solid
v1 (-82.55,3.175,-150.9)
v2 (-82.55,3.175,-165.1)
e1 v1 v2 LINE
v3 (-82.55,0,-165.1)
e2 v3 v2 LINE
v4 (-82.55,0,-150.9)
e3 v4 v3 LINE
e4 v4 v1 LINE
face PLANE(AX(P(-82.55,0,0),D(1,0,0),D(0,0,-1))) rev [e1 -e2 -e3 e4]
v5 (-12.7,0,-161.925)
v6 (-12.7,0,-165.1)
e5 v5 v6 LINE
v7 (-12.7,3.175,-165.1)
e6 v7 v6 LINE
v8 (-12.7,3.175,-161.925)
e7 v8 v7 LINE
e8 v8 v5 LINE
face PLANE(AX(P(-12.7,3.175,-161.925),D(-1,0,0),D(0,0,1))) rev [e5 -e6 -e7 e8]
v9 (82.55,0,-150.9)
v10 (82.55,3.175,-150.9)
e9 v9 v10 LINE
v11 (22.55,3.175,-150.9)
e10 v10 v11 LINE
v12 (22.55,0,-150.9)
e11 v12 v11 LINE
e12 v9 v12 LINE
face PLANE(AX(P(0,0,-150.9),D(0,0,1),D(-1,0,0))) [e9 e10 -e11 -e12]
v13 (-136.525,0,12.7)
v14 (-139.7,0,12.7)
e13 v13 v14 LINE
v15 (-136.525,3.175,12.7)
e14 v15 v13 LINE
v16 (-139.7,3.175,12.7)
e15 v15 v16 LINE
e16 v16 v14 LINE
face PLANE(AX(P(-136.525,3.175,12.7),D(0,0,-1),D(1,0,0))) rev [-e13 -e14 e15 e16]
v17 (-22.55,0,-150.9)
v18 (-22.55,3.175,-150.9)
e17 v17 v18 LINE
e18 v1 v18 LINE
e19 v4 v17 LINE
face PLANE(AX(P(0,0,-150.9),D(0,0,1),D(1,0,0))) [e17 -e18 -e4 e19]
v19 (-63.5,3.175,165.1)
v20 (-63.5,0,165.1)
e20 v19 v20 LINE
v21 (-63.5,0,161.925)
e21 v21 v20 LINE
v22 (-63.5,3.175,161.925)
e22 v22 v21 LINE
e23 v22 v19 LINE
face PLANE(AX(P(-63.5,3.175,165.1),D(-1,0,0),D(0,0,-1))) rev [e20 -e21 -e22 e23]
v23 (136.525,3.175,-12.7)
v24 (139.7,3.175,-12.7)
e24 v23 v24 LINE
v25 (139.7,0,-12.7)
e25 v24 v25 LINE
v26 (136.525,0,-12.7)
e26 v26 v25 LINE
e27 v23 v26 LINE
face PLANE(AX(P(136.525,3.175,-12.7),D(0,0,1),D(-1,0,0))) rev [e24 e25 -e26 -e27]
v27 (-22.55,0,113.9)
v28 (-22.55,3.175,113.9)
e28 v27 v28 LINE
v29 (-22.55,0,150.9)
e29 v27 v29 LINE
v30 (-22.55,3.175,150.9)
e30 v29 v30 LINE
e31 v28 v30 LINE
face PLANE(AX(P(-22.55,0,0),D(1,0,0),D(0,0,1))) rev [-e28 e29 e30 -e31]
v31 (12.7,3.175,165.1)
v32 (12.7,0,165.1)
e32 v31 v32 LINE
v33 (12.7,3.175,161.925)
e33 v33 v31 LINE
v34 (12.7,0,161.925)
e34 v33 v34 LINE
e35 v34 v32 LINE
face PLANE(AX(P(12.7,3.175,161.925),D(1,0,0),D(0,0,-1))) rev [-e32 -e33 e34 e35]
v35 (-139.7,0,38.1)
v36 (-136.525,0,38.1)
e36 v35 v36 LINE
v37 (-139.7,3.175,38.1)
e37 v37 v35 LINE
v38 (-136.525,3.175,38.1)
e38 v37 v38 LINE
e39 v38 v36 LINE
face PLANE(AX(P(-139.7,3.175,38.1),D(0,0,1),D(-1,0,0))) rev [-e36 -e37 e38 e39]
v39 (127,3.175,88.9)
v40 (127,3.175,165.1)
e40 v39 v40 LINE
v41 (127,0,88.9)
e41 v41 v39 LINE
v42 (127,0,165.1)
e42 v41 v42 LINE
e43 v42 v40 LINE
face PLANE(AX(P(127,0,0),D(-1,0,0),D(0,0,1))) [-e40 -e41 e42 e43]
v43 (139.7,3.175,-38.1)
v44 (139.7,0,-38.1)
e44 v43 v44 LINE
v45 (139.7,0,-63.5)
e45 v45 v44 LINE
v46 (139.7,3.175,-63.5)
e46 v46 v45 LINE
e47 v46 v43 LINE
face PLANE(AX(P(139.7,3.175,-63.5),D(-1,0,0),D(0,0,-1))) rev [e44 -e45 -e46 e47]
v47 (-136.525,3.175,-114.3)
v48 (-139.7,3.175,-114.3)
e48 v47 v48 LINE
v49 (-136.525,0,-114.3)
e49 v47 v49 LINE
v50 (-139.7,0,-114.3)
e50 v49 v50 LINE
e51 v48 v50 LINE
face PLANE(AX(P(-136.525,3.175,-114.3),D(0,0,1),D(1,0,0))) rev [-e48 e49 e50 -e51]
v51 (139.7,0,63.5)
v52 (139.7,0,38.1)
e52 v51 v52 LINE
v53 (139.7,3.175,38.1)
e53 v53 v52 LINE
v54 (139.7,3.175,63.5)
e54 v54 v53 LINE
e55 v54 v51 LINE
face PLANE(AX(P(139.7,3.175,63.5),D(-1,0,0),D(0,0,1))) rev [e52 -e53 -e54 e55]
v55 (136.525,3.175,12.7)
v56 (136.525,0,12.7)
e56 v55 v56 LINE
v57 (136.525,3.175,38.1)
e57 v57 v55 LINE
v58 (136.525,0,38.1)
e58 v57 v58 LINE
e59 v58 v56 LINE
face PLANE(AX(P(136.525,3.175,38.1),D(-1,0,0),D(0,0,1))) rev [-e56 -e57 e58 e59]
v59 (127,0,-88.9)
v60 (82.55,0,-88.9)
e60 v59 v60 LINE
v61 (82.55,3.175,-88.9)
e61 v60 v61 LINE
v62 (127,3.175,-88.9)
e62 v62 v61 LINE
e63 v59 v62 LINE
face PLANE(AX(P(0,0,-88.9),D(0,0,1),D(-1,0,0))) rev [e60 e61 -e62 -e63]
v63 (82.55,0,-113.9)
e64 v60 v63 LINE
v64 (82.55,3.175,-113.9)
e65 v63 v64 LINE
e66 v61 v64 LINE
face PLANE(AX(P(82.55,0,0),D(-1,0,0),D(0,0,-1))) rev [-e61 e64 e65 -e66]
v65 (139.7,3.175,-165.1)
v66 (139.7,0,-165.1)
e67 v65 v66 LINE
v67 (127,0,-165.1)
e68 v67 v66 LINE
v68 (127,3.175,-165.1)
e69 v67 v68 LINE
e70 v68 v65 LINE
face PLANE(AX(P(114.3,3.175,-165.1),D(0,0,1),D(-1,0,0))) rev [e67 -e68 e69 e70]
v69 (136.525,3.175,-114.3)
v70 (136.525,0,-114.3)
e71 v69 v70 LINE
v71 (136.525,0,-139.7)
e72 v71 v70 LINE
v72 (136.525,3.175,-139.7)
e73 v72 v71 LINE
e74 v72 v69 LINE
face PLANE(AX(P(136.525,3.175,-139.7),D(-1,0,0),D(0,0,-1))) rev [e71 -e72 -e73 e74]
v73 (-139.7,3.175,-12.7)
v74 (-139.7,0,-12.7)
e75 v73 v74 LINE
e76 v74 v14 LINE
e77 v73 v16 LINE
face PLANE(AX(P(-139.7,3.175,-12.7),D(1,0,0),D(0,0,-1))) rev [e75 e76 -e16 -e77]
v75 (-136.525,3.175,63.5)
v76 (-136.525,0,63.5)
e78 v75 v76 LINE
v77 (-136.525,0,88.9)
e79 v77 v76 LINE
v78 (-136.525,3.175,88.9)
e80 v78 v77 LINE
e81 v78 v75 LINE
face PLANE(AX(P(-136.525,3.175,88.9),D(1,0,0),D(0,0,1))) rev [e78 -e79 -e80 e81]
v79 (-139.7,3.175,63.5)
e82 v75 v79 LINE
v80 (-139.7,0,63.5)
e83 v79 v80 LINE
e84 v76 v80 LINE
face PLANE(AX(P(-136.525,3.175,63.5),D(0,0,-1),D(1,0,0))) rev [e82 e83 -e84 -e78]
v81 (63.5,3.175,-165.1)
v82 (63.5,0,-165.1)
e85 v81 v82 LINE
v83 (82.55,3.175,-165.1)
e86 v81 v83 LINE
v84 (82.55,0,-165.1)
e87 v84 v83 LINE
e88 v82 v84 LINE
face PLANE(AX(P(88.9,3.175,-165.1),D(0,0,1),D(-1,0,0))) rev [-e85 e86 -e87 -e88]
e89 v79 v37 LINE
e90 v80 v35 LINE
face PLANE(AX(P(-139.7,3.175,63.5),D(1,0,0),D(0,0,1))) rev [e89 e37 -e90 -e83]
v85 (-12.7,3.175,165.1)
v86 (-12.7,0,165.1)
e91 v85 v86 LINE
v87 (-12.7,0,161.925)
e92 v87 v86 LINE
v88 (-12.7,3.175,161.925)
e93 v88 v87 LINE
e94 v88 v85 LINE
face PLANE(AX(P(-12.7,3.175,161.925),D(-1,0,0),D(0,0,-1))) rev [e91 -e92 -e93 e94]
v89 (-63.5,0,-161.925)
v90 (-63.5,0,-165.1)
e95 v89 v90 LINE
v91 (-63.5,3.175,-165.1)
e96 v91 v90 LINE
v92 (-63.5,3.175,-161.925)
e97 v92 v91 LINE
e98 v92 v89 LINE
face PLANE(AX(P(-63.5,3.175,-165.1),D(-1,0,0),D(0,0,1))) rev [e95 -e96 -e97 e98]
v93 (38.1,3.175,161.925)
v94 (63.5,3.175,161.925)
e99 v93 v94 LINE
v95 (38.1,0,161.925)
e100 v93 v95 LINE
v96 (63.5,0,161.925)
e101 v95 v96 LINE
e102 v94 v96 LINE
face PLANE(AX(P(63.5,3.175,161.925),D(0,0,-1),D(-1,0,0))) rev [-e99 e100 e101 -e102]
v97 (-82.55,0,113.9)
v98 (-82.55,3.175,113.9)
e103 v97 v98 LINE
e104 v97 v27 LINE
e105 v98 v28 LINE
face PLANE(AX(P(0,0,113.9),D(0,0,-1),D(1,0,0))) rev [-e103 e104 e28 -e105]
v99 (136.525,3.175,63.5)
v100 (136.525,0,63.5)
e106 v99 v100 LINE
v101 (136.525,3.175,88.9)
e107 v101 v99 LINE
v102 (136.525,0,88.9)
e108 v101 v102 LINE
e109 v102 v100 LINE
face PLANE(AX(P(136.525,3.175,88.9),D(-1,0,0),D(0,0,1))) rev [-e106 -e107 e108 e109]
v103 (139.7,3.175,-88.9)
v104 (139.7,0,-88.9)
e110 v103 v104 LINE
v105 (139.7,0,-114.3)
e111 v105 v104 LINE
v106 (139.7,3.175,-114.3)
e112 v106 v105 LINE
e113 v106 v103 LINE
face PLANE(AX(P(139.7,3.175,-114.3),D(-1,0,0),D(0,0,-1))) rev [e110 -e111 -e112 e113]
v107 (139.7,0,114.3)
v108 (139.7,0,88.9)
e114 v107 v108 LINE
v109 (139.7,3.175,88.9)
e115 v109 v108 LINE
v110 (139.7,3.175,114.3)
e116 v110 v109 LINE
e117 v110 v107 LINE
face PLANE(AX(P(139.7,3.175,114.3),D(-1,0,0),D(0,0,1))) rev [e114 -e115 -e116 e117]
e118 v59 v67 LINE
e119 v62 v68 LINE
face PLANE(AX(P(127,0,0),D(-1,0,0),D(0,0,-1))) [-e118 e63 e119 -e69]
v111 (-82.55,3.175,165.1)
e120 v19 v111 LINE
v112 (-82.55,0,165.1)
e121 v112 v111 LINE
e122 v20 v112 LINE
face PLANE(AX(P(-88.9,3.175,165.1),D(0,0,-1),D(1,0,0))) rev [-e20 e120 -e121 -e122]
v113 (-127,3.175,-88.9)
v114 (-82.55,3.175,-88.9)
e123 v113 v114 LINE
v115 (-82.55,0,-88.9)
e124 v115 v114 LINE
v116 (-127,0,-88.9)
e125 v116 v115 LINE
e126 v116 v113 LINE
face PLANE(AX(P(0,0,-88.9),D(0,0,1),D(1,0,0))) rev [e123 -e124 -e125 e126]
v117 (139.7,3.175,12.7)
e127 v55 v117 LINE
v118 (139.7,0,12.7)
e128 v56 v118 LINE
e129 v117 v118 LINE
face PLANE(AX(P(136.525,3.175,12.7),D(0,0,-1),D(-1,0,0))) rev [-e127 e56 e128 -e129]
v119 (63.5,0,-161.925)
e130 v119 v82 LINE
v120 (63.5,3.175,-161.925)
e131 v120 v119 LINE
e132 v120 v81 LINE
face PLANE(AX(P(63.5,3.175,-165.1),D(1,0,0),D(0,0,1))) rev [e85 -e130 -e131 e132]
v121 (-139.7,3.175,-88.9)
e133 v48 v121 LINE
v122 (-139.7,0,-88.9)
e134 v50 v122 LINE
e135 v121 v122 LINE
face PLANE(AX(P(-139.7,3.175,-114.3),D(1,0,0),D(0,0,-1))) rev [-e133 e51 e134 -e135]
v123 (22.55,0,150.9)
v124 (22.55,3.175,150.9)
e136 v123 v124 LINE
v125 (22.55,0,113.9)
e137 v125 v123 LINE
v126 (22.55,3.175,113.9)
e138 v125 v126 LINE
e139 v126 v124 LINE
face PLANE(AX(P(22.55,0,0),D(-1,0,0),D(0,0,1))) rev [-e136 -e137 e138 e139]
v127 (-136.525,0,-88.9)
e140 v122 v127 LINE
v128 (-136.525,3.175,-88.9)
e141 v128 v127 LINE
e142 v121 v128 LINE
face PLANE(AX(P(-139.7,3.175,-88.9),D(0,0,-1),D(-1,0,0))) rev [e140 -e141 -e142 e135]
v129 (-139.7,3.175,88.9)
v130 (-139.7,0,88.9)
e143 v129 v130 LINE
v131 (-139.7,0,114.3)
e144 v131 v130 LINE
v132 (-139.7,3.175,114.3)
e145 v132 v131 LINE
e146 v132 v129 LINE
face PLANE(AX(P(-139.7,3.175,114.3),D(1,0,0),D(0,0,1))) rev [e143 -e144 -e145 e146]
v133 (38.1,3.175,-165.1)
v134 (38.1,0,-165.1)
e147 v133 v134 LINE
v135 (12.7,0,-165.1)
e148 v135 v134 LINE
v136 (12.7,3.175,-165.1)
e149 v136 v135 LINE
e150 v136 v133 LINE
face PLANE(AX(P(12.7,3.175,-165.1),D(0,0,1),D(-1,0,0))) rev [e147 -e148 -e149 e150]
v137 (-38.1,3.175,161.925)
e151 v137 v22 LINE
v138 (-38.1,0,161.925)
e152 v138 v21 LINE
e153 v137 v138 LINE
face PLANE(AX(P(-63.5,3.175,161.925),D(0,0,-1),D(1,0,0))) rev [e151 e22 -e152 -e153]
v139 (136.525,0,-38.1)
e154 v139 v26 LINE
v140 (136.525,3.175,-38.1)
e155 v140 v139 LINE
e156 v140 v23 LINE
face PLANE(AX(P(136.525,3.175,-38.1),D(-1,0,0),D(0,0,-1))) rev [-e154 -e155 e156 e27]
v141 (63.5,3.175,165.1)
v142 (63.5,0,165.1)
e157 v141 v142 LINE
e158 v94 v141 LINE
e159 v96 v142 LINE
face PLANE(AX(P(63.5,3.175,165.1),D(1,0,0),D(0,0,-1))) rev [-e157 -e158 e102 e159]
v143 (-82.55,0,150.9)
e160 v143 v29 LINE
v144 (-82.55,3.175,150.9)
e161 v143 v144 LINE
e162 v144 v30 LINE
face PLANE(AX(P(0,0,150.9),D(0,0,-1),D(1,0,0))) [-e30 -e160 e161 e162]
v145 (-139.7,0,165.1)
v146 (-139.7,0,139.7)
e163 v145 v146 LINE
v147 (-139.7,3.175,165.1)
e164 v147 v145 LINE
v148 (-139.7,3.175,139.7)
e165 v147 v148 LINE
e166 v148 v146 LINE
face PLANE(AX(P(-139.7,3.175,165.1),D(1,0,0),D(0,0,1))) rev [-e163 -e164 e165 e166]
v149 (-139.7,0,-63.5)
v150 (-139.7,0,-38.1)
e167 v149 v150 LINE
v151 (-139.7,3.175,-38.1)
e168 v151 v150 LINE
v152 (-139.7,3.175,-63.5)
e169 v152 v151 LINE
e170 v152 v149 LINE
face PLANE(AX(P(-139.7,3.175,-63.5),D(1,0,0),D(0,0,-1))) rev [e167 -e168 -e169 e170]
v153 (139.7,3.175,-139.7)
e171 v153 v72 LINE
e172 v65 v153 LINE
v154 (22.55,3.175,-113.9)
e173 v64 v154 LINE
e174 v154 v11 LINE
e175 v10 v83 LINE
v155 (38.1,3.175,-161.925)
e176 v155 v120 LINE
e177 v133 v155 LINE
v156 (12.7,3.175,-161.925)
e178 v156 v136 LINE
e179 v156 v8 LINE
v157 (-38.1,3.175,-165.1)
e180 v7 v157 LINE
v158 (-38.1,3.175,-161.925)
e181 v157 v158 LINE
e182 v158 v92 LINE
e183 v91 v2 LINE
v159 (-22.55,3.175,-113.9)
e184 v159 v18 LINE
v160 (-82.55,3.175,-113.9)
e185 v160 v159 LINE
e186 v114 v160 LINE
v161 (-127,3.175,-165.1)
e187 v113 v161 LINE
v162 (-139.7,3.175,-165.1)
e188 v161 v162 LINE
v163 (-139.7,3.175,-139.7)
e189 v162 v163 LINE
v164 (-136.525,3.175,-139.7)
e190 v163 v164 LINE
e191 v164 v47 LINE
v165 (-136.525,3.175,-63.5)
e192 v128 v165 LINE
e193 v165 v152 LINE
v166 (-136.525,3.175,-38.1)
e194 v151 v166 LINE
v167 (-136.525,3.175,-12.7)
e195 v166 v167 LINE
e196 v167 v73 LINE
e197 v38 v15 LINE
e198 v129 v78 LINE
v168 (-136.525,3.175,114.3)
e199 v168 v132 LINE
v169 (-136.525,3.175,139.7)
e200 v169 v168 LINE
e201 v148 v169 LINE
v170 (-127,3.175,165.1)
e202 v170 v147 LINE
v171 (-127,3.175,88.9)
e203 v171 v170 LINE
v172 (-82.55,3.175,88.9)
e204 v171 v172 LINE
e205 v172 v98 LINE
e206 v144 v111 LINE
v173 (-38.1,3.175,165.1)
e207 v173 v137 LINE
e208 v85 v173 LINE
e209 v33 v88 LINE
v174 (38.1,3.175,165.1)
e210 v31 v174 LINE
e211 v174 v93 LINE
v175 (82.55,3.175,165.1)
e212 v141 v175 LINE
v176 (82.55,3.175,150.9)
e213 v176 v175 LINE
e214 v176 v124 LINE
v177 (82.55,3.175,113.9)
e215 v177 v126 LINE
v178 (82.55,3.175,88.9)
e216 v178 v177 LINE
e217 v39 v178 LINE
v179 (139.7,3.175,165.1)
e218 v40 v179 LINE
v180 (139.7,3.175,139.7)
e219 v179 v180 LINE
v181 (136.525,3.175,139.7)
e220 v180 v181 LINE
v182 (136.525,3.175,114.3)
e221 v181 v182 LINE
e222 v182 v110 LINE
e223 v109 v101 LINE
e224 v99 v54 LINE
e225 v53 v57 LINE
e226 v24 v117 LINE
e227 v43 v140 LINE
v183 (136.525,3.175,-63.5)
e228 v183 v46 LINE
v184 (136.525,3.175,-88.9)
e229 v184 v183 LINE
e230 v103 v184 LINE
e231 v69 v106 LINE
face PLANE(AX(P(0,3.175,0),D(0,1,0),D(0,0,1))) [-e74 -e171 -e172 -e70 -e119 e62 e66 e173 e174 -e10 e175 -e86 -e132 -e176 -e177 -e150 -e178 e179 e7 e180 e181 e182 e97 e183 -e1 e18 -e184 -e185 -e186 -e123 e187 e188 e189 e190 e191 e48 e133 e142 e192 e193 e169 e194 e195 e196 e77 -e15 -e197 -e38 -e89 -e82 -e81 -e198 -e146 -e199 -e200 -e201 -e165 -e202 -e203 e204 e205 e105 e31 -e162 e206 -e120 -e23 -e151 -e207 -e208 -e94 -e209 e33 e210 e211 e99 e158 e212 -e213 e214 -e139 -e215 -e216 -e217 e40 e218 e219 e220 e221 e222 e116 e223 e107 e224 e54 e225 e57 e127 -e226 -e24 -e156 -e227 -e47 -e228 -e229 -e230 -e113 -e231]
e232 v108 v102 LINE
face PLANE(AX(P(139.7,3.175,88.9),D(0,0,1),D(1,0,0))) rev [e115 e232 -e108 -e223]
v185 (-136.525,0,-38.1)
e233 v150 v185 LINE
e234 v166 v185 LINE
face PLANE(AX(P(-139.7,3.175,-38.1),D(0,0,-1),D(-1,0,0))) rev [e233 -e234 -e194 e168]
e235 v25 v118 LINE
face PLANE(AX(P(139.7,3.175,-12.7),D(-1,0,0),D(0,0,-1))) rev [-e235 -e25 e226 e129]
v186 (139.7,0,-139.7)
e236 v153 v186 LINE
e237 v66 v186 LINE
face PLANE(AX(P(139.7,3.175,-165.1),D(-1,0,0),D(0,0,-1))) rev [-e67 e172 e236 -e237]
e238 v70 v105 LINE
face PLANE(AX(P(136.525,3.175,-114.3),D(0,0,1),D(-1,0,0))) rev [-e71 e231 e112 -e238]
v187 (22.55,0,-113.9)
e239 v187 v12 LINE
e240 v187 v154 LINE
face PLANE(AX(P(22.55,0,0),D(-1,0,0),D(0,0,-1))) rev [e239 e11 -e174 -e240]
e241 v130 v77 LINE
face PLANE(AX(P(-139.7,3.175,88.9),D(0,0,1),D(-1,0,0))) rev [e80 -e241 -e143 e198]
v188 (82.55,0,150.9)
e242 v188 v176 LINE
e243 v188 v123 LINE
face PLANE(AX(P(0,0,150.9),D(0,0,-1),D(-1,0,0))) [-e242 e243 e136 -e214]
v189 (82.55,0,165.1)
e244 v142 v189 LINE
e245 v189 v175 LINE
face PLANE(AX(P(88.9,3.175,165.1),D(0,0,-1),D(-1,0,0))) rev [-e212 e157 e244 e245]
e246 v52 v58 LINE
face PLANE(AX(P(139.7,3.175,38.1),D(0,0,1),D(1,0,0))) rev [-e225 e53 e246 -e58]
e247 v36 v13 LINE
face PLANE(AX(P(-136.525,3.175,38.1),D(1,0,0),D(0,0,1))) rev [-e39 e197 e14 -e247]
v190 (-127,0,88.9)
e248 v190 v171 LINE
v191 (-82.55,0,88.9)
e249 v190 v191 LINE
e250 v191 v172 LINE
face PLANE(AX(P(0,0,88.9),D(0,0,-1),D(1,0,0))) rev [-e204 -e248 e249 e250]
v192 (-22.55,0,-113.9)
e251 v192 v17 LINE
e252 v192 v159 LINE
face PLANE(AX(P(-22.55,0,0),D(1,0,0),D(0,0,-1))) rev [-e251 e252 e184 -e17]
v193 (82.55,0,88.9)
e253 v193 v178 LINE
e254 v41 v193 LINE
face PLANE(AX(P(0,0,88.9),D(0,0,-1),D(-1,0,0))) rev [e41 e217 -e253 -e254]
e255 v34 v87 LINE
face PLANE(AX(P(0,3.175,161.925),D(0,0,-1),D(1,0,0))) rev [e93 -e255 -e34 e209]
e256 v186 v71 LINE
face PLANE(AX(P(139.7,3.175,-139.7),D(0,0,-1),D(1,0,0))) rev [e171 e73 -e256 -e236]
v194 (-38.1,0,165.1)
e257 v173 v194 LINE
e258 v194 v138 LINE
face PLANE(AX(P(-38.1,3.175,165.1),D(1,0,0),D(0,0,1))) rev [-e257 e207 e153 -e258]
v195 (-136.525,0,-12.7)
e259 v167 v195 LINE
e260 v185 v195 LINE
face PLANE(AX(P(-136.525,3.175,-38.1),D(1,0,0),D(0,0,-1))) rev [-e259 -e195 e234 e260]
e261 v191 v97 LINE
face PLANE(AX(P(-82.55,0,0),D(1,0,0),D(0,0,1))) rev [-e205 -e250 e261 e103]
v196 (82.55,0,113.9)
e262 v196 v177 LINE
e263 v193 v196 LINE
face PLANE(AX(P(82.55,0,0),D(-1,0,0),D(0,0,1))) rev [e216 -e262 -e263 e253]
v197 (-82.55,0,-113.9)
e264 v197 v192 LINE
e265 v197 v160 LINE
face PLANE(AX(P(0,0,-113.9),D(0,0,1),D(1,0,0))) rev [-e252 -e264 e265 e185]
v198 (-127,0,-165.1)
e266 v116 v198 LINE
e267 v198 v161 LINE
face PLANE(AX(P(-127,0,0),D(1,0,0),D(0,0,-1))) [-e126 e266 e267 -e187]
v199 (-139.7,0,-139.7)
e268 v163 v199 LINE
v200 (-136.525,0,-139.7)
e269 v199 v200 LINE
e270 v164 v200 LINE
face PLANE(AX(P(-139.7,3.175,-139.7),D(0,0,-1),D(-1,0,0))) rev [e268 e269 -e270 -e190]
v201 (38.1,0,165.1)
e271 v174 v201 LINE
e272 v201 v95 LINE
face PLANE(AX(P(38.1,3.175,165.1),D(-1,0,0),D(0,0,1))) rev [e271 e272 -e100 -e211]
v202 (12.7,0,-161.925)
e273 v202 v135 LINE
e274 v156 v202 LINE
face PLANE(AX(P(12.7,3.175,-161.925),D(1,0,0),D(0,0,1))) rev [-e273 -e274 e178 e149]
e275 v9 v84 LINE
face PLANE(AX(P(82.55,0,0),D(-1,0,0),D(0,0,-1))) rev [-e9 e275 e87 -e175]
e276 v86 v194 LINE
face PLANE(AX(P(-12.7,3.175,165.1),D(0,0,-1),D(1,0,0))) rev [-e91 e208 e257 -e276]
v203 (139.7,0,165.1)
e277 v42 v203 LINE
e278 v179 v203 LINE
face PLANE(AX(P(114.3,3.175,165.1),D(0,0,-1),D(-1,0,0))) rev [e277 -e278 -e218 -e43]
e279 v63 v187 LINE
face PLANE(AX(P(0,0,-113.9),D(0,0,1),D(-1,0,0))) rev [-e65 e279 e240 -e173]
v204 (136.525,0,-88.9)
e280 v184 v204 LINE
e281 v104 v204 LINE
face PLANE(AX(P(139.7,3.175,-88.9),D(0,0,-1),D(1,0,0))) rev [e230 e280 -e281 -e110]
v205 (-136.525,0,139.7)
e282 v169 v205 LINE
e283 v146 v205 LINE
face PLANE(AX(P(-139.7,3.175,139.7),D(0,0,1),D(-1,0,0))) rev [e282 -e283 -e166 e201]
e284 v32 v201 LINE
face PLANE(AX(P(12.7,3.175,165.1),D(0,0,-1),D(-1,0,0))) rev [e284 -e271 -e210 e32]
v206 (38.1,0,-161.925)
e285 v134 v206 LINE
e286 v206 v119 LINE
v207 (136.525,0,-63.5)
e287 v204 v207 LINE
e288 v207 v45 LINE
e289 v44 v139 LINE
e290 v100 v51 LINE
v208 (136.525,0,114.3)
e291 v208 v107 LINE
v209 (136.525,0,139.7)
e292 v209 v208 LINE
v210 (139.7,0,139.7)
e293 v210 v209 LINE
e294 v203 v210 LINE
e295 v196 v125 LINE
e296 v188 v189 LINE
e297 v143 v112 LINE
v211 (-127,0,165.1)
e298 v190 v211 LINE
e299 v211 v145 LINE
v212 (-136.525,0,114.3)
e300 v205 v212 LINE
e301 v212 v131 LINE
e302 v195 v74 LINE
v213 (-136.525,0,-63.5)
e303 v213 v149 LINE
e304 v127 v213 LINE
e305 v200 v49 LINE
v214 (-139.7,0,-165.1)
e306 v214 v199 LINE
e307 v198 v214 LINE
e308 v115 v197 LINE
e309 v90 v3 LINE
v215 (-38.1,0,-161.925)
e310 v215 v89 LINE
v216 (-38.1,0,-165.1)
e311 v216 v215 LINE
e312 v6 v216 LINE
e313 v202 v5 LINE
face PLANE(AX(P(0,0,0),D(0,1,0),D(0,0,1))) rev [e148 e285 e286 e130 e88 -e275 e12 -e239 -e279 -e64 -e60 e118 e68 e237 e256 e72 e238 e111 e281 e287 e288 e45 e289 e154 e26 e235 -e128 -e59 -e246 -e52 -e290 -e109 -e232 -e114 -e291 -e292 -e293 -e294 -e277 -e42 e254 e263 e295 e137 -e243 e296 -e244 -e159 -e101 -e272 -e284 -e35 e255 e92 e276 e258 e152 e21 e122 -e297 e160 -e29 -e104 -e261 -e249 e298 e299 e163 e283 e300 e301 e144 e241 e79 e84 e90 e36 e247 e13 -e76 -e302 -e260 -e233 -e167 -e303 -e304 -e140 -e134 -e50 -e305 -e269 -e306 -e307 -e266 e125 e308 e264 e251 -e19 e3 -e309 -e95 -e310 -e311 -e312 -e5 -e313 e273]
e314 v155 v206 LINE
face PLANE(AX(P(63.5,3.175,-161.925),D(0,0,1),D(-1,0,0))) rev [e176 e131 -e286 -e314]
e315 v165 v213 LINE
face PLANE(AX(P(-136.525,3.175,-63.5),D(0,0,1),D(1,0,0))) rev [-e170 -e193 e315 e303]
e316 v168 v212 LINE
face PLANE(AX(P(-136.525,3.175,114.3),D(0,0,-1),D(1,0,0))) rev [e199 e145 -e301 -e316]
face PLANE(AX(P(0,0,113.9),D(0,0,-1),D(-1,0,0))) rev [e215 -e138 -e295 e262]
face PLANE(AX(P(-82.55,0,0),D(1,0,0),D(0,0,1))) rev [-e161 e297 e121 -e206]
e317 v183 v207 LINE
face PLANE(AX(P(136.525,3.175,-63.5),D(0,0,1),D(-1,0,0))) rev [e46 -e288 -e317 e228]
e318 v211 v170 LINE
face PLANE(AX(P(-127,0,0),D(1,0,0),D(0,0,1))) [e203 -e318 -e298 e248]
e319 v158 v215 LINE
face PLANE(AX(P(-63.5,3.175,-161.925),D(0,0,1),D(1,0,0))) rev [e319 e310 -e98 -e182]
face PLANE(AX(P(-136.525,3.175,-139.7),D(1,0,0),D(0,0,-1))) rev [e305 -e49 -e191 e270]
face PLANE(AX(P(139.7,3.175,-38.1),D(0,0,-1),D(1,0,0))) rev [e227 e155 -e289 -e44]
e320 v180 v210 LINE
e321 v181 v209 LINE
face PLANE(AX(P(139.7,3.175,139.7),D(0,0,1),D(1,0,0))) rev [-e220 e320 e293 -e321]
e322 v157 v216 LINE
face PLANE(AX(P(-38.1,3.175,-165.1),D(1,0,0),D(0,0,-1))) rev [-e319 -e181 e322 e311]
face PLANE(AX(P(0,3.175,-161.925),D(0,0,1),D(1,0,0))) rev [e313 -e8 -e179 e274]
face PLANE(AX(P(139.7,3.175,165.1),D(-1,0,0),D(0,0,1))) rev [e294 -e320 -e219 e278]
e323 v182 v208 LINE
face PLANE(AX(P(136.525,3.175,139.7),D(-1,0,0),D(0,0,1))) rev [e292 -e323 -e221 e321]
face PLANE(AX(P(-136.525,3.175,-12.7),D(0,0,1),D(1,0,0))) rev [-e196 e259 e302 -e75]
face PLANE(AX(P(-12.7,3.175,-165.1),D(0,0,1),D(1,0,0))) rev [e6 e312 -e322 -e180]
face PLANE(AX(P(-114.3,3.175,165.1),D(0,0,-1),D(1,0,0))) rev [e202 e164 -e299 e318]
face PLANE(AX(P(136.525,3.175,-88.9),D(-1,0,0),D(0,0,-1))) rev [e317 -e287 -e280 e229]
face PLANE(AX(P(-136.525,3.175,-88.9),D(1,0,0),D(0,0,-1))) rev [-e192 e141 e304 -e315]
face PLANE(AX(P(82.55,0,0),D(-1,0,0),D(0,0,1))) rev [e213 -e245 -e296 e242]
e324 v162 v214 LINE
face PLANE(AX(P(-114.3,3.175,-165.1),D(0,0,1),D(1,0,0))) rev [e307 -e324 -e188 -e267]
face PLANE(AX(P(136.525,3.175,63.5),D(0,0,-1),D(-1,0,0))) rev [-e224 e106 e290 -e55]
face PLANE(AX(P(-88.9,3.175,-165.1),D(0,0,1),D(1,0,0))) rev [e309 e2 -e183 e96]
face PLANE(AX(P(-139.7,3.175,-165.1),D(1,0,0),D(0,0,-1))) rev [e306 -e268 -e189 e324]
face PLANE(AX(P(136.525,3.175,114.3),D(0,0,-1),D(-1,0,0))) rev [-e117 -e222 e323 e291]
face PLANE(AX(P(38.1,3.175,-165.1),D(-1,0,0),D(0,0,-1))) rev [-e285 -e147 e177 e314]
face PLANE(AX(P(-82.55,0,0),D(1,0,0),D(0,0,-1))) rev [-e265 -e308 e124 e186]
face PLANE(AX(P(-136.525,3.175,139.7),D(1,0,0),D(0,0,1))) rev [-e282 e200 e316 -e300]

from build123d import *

# Parameters (mm, degrees)
BOSS_EXTRUDE1_DEPTH     = 3.175
CUT_EXTRUDE1_DEPTH      = 217.296510894
CUT_EXTRUDE1_DEPTH_BACK = 217.296510894
SKETCH3_W               = 60
SKETCH3_H               = 37
MIRROR1_DEPTH           = 3.175


# Read off the part's stored shape, not the designer's step: Mirror1
with BuildPart() as part:
    # Sketch1 → Boss-Extrude1 (new body)
    with BuildSketch(Plane(origin=(0, 0, 0), x_dir=(1, 0, 0), z_dir=(0, 1, 0))):
        Polygon((-139.7, 0), (0, 0), (0, 161.925), (-12.7, 161.925), (-12.7, 165.1), (-38.1, 165.1), (-38.1, 161.925), (-63.5, 161.925), (-63.5, 165.1), (-88.9, 165.1), (-88.9, 161.925), (-114.3, 161.925), (-114.3, 165.1), (-139.7, 165.1), (-139.7, 139.7), (-136.525, 139.7), (-136.525, 114.3), (-139.7, 114.3), (-139.7, 88.9), (-136.525, 88.9), (-136.525, 63.5), (-139.7, 63.5), (-139.7, 38.1), (-136.525, 38.1), (-136.525, 12.7), (-139.7, 12.7), align=None)
    extrude(amount=BOSS_EXTRUDE1_DEPTH)

    # Sketch3 → Cut-Extrude1 (cut, two sides: drawn at the far end of the back side and taken through both)
    with BuildSketch(Plane(origin=(0, 3.175, 0), x_dir=(1, 0, 0), z_dir=(0, 1, 0)).offset(-CUT_EXTRUDE1_DEPTH_BACK)):
        with Locations((-52.55, 132.4)):
            Rectangle(SKETCH3_W, SKETCH3_H)
        Polygon((-127, 165.1), (-127, 88.9), (-82.55, 88.9), (-82.55, 113.9), (-82.55, 150.9), (-82.55, 165.1), (-88.9, 165.1), (-88.9, 161.925), (-114.3, 161.925), (-114.3, 165.1), align=None)
    extrude(amount=CUT_EXTRUDE1_DEPTH + CUT_EXTRUDE1_DEPTH_BACK, mode=Mode.SUBTRACT)

    # Mirror1 outline → Mirror1 (add)
    with BuildSketch(Plane(origin=(0, 0, 0), x_dir=(1, 0, 0), z_dir=(0, 1, 0))):
        Polygon((139.7, 165.1), (127, 165.1), (127, 88.9), (82.55, 88.9), (82.55, 113.9), (22.55, 113.9), (22.55, 150.9), (82.55, 150.9), (82.55, 165.1), (63.5, 165.1), (63.5, 161.925), (38.1, 161.925), (38.1, 165.1), (12.7, 165.1), (12.7, 161.925), (0, 161.925), (0, 0), (-139.7, 0), (-139.7, -12.7), (-136.525, -12.7), (-136.525, -38.1), (-139.7, -38.1), (-139.7, -63.5), (-136.525, -63.5), (-136.525, -88.9), (-139.7, -88.9), (-139.7, -114.3), (-136.525, -114.3), (-136.525, -139.7), (-139.7, -139.7), (-139.7, -165.1), (-127, -165.1), (-127, -88.9), (-82.55, -88.9), (-82.55, -113.9), (-22.55, -113.9), (-22.55, -150.9), (-82.55, -150.9), (-82.55, -165.1), (-63.5, -165.1), (-63.5, -161.925), (-38.1, -161.925), (-38.1, -165.1), (-12.7, -165.1), (-12.7, -161.925), (12.7, -161.925), (12.7, -165.1), (38.1, -165.1), (38.1, -161.925), (63.5, -161.925), (63.5, -165.1), (82.55, -165.1), (82.55, -150.9), (22.55, -150.9), (22.55, -113.9), (82.55, -113.9), (82.55, -88.9), (127, -88.9), (127, -165.1), (139.7, -165.1), (139.7, -139.7), (136.525, -139.7), (136.525, -114.3), (139.7, -114.3), (139.7, -88.9), (136.525, -88.9), (136.525, -63.5), (139.7, -63.5), (139.7, -38.1), (136.525, -38.1), (136.525, -12.7), (139.7, -12.7), (139.7, 12.7), (136.525, 12.7), (136.525, 38.1), (139.7, 38.1), (139.7, 63.5), (136.525, 63.5), (136.525, 88.9), (139.7, 88.9), (139.7, 114.3), (136.525, 114.3), (136.525, 139.7), (139.7, 139.7), align=None)
    extrude(amount=MIRROR1_DEPTH)


solid = part.part
